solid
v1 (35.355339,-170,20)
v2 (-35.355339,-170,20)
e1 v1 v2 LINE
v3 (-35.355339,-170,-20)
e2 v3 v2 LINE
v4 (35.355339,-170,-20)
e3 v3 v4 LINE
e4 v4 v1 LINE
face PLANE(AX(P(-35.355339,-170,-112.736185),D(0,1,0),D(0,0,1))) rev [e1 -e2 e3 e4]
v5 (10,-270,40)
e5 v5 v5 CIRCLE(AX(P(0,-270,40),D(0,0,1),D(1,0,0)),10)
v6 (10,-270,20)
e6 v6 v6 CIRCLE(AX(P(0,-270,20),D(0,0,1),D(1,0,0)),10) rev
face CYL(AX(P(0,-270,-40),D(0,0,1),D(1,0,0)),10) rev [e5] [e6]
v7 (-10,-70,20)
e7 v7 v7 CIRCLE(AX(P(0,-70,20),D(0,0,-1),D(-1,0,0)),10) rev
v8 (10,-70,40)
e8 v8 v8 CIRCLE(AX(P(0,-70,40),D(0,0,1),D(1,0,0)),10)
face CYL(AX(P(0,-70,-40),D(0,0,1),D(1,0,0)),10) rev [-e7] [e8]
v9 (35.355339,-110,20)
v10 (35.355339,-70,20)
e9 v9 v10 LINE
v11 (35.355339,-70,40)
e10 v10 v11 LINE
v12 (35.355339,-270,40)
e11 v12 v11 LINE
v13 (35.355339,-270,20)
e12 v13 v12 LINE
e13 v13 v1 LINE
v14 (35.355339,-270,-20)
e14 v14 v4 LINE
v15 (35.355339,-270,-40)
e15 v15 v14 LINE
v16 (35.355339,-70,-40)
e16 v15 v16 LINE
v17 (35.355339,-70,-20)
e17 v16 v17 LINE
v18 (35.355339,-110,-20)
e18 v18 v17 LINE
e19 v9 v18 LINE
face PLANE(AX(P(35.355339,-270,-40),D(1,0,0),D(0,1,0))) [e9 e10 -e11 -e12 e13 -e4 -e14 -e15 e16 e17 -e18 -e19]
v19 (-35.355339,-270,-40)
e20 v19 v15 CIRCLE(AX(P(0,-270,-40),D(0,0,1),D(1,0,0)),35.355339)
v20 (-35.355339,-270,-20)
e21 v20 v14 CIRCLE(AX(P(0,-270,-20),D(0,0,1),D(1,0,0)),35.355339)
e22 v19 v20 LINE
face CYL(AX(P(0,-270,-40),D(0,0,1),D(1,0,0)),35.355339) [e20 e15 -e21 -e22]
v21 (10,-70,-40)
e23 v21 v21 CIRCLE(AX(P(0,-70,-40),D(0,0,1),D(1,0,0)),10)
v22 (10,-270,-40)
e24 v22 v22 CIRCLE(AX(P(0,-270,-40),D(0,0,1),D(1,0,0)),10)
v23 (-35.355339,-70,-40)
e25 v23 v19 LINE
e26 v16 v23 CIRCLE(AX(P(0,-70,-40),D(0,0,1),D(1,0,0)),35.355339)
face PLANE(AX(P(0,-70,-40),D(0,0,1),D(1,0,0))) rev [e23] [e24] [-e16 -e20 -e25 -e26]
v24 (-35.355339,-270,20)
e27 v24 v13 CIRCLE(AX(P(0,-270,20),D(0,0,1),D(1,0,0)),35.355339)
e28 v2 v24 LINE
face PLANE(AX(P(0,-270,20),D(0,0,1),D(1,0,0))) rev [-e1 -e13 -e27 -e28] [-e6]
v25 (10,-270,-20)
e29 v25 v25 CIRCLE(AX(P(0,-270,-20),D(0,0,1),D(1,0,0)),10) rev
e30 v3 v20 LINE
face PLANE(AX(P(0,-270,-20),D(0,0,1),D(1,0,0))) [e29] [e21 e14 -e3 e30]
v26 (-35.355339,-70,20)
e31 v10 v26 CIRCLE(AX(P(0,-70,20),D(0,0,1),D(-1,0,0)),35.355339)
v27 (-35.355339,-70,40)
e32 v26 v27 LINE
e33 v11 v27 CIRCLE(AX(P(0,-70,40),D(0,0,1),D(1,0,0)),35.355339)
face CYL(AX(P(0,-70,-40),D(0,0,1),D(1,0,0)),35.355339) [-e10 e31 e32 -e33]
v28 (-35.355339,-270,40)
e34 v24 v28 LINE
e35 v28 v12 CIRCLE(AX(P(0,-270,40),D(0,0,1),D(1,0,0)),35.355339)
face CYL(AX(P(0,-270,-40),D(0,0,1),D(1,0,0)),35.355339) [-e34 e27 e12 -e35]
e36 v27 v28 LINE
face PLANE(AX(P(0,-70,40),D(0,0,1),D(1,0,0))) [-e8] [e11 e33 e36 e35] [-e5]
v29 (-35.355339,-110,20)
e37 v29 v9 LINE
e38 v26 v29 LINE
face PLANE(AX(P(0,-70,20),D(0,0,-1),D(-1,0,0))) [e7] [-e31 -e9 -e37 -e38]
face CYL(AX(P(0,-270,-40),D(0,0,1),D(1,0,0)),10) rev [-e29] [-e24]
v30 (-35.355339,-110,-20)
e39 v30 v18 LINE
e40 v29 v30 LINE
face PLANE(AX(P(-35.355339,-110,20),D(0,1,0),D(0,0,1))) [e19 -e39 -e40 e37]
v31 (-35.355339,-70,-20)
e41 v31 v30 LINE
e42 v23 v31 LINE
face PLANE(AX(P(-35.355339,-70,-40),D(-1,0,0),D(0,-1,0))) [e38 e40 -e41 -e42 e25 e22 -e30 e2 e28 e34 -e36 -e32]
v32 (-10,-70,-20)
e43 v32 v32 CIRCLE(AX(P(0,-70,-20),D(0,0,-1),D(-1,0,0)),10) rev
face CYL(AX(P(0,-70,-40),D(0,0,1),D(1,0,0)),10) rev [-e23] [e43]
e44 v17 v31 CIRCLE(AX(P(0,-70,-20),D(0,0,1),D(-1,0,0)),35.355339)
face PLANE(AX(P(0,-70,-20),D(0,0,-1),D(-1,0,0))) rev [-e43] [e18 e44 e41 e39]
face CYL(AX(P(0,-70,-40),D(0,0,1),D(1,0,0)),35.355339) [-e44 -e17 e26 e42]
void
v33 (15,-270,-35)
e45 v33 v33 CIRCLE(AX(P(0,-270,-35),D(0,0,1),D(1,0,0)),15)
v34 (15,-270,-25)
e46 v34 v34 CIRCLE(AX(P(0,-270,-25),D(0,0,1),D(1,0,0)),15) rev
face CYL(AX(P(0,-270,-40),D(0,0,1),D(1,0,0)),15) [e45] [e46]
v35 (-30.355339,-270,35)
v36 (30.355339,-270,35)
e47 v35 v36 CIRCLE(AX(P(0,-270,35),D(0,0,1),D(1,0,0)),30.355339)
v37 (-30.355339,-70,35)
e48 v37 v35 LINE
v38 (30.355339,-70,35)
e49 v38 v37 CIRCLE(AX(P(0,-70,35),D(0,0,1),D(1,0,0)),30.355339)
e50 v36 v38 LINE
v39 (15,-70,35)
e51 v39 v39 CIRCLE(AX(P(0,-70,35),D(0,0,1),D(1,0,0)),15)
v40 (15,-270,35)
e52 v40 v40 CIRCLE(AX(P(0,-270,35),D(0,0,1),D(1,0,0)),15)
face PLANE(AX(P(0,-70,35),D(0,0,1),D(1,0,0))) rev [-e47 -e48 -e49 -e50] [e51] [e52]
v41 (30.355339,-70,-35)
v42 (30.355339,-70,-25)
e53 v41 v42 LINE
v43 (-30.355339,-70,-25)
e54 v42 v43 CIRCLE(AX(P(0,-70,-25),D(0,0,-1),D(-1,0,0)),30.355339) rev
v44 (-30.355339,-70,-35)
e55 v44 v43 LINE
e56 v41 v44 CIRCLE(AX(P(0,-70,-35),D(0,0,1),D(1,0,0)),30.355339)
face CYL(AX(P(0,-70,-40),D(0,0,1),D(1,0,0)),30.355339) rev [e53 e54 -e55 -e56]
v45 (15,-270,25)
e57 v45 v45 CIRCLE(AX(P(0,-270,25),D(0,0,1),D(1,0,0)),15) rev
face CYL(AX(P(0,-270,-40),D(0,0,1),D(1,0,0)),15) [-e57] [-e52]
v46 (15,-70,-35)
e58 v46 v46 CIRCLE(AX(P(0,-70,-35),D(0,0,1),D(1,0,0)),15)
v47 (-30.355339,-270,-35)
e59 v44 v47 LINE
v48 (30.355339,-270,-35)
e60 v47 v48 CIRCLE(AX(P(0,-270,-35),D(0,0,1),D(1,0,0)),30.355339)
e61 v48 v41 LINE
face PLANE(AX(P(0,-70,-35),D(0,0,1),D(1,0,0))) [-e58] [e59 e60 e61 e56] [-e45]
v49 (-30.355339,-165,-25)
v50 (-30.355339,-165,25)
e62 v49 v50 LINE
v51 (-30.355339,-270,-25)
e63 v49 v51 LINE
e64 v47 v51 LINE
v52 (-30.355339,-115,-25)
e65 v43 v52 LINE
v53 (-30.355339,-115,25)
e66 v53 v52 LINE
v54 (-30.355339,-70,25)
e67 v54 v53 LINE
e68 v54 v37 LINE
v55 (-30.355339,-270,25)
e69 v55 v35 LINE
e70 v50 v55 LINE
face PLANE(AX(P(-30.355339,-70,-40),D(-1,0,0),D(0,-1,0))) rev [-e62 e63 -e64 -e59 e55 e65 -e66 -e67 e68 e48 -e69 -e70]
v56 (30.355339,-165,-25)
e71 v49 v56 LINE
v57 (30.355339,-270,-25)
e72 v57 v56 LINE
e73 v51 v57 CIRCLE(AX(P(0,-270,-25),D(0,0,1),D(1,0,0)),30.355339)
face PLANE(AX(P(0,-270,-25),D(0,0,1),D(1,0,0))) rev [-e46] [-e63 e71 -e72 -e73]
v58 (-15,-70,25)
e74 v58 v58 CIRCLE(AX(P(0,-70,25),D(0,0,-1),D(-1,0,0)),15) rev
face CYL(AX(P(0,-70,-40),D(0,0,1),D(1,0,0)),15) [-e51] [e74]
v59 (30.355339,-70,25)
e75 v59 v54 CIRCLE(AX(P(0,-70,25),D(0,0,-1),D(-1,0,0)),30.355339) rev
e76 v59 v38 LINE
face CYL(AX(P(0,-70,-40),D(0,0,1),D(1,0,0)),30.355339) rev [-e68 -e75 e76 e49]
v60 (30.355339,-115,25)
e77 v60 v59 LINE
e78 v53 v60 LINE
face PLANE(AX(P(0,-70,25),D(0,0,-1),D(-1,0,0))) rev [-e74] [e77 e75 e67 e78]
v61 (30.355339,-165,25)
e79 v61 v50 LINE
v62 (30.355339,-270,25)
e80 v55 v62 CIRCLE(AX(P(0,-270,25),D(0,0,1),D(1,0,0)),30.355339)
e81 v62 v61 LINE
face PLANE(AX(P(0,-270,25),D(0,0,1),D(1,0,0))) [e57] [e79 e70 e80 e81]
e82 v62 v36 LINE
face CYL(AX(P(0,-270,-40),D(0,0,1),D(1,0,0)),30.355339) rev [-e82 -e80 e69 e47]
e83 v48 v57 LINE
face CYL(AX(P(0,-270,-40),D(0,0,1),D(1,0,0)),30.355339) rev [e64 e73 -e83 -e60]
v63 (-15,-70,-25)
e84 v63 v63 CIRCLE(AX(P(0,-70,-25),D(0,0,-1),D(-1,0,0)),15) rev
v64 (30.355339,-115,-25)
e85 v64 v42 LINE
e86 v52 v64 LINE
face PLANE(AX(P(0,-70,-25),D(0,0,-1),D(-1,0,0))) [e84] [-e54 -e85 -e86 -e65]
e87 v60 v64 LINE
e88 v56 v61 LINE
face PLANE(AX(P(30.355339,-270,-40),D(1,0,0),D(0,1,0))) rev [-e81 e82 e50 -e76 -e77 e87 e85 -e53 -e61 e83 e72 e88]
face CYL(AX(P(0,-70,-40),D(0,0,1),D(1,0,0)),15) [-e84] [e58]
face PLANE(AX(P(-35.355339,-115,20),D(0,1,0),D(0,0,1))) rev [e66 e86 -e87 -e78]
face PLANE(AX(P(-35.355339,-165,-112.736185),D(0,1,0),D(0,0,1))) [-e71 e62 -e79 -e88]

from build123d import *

# Parameters (mm, degrees)
BOSS_EXTRUDE2_DEPTH            = 40
BOSS_EXTRUDE2_DEPTH_BACK       = 40
SKETCH2_R                      = 10
CUT_EXTRUDE1_DEPTH             = 20
CUT_EXTRUDE1_DEPTH_BACK        = 20
CUT_EXTRUDE2_REACH             = 311.987
SKETCH4_W                      = 70.710678118
SKETCH4_H                      = 60
CUT_EXTRUDE2_DIRECTION_2_REACH = 311.987
SHELL1_START                   = -35
SHELL1_OUTLINE_W               = 60.710678118
SHELL1_OUTLINE_H               = 50
SHELL1_DEPTH                   = 70
SHELL1_2_OUTLINE_R             = 15
SHELL1_2_DEPTH                 = 10
SHELL1_START_2                 = 25
SHELL1_3_OUTLINE_R             = 15
SHELL1_3_DEPTH                 = 10


# Read off the part's stored shape, not the designer's step: Shell1
with BuildPart() as part:
    # Sketch2 → Boss-Extrude2 (new, two sides: drawn at the far end of the back side and taken through both)
    with BuildSketch(Plane.XY.offset(-BOSS_EXTRUDE2_DEPTH_BACK)):
        with BuildLine():
            Line((-35.355339059, -70), (-35.355339059, -270))
            ThreePointArc((-35.355339059, -270), (0, -305.355339059), (35.355339059, -270))
            Line((35.355339059, -270), (35.355339059, -70))
            ThreePointArc((35.355339059, -70), (0, -34.644660941), (-35.355339059, -70))
        make_face()
        with Locations((0, -70)):
            Circle(SKETCH2_R, mode=Mode.SUBTRACT)
        with Locations((0, -270)):
            Circle(SKETCH2_R, mode=Mode.SUBTRACT)
    extrude(amount=BOSS_EXTRUDE2_DEPTH + BOSS_EXTRUDE2_DEPTH_BACK)

    # Sketch3 → Cut-Extrude1 (cut, two sides: drawn at the far end of the back side and taken through both)
    with BuildSketch(Plane.XY.offset(-CUT_EXTRUDE1_DEPTH_BACK)):
        with BuildLine():
            Line((-35.355339059, -230), (35.355339059, -230))
            Line((35.355339059, -230), (35.355339059, -270))
            ThreePointArc((35.355339059, -270), (0, -305.355339059), (-35.355339059, -270))
            Line((-35.355339059, -270), (-35.355339059, -230))
        make_face()
        with BuildLine():
            Line((35.355339059, -110), (35.355339059, -70))
            ThreePointArc((35.355339059, -70), (0, -34.644660941), (-35.355339059, -70))
            Line((-35.355339059, -70), (-35.355339059, -110))
            Line((-35.355339059, -110), (35.355339059, -110))
        make_face()
    extrude(amount=CUT_EXTRUDE1_DEPTH + CUT_EXTRUDE1_DEPTH_BACK, mode=Mode.SUBTRACT)

    # Cut-Extrude2: up to this face of the body (flat: up to its plane)
    cut_extrude2_end = Plane(part.part.faces().sort_by_distance((-34.321974306, -250, -20))[0])
    # Sketch4 → Cut-Extrude2 (cut, up to the picked face)
    with BuildSketch(Plane.XY, mode=Mode.PRIVATE) as cut_extrude2_sk1:
        with Locations((0, -200)):
            Rectangle(SKETCH4_W, SKETCH4_H)
    cut_extrude2_tool1 = split(extrude(cut_extrude2_sk1.sketch, amount=-CUT_EXTRUDE2_REACH, mode=Mode.PRIVATE), bisect_by=cut_extrude2_end, keep=Keep.BOTH, mode=Mode.PRIVATE)
    add(cut_extrude2_tool1.solids().sort_by(Axis((0, -200, 0), (0, 0, -1)))[0], mode=Mode.SUBTRACT)

    # Cut-Extrude2 direction 2: up to this face of the body (flat: up to its plane)
    cut_extrude2_direction_2_end = Plane(part.part.faces().sort_by_distance((-34.321974306, -250, 20))[0])
    # Sketch4 → Cut-Extrude2 direction 2 (cut, up to the picked face)
    with BuildSketch(Plane.XY, mode=Mode.PRIVATE) as cut_extrude2_direction_2_sk1:
        with Locations((0, -200)):
            Rectangle(SKETCH4_W, SKETCH4_H)
    cut_extrude2_direction_2_tool1 = split(extrude(cut_extrude2_direction_2_sk1.sketch, amount=CUT_EXTRUDE2_DIRECTION_2_REACH, mode=Mode.PRIVATE), bisect_by=cut_extrude2_direction_2_end, keep=Keep.BOTH, mode=Mode.PRIVATE)
    add(cut_extrude2_direction_2_tool1.solids().sort_by(Axis((0, -200, 0), (0, 0, 1)))[0], mode=Mode.SUBTRACT)

    # Shell1 outline → Shell1 (cut)
    with BuildSketch(Plane.XY.offset(SHELL1_START)):
        with Locations((0, -140)):
            Rectangle(SHELL1_OUTLINE_W, SHELL1_OUTLINE_H)
    extrude(amount=SHELL1_DEPTH, mode=Mode.SUBTRACT)

    # Shell1 2 outline → Shell1 2 (cut)
    # profile 1 of 2: a face of its own
    with BuildSketch(Plane.XY.offset(SHELL1_START)):
        with BuildLine():
            ThreePointArc((-30.355339059, -270), (0, -300.355339059), (30.355339059, -270))
            Line((30.355339059, -270), (30.355339059, -165))
            Line((30.355339059, -165), (-30.355339059, -165))
            Line((-30.355339059, -165), (-30.355339059, -270))
        make_face()
        with Locations((0, -270)):
            Circle(SHELL1_2_OUTLINE_R, mode=Mode.SUBTRACT)
    # profile 2 of 2: a face of its own
    with BuildSketch(Plane.XY.offset(SHELL1_START)):
        with BuildLine():
            Line((-30.355339059, -115), (30.355339059, -115))
            Line((30.355339059, -115), (30.355339059, -70))
            ThreePointArc((30.355339059, -70), (0, -39.644660941), (-30.355339059, -70))
            Line((-30.355339059, -70), (-30.355339059, -115))
        make_face()
        with Locations((0, -70)):
            Circle(SHELL1_2_OUTLINE_R, mode=Mode.SUBTRACT)
    extrude(amount=SHELL1_2_DEPTH, mode=Mode.SUBTRACT)

    # Shell1 3 outline → Shell1 3 (cut)
    # profile 1 of 2: a face of its own
    with BuildSketch(Plane.XY.offset(SHELL1_START_2)):
        with BuildLine():
            ThreePointArc((-30.355339059, -270), (0, -300.355339059), (30.355339059, -270))
            Line((30.355339059, -270), (30.355339059, -165))
            Line((30.355339059, -165), (-30.355339059, -165))
            Line((-30.355339059, -165), (-30.355339059, -270))
        make_face()
        with Locations((0, -270)):
            Circle(SHELL1_3_OUTLINE_R, mode=Mode.SUBTRACT)
    # profile 2 of 2: a face of its own
    with BuildSketch(Plane.XY.offset(SHELL1_START_2)):
        with BuildLine():
            Line((-30.355339059, -115), (30.355339059, -115))
            Line((30.355339059, -115), (30.355339059, -70))
            ThreePointArc((30.355339059, -70), (0, -39.644660941), (-30.355339059, -70))
            Line((-30.355339059, -70), (-30.355339059, -115))
        make_face()
        with Locations((0, -70)):
            Circle(SHELL1_3_OUTLINE_R, mode=Mode.SUBTRACT)
    extrude(amount=SHELL1_3_DEPTH, mode=Mode.SUBTRACT)


solid = part.part
